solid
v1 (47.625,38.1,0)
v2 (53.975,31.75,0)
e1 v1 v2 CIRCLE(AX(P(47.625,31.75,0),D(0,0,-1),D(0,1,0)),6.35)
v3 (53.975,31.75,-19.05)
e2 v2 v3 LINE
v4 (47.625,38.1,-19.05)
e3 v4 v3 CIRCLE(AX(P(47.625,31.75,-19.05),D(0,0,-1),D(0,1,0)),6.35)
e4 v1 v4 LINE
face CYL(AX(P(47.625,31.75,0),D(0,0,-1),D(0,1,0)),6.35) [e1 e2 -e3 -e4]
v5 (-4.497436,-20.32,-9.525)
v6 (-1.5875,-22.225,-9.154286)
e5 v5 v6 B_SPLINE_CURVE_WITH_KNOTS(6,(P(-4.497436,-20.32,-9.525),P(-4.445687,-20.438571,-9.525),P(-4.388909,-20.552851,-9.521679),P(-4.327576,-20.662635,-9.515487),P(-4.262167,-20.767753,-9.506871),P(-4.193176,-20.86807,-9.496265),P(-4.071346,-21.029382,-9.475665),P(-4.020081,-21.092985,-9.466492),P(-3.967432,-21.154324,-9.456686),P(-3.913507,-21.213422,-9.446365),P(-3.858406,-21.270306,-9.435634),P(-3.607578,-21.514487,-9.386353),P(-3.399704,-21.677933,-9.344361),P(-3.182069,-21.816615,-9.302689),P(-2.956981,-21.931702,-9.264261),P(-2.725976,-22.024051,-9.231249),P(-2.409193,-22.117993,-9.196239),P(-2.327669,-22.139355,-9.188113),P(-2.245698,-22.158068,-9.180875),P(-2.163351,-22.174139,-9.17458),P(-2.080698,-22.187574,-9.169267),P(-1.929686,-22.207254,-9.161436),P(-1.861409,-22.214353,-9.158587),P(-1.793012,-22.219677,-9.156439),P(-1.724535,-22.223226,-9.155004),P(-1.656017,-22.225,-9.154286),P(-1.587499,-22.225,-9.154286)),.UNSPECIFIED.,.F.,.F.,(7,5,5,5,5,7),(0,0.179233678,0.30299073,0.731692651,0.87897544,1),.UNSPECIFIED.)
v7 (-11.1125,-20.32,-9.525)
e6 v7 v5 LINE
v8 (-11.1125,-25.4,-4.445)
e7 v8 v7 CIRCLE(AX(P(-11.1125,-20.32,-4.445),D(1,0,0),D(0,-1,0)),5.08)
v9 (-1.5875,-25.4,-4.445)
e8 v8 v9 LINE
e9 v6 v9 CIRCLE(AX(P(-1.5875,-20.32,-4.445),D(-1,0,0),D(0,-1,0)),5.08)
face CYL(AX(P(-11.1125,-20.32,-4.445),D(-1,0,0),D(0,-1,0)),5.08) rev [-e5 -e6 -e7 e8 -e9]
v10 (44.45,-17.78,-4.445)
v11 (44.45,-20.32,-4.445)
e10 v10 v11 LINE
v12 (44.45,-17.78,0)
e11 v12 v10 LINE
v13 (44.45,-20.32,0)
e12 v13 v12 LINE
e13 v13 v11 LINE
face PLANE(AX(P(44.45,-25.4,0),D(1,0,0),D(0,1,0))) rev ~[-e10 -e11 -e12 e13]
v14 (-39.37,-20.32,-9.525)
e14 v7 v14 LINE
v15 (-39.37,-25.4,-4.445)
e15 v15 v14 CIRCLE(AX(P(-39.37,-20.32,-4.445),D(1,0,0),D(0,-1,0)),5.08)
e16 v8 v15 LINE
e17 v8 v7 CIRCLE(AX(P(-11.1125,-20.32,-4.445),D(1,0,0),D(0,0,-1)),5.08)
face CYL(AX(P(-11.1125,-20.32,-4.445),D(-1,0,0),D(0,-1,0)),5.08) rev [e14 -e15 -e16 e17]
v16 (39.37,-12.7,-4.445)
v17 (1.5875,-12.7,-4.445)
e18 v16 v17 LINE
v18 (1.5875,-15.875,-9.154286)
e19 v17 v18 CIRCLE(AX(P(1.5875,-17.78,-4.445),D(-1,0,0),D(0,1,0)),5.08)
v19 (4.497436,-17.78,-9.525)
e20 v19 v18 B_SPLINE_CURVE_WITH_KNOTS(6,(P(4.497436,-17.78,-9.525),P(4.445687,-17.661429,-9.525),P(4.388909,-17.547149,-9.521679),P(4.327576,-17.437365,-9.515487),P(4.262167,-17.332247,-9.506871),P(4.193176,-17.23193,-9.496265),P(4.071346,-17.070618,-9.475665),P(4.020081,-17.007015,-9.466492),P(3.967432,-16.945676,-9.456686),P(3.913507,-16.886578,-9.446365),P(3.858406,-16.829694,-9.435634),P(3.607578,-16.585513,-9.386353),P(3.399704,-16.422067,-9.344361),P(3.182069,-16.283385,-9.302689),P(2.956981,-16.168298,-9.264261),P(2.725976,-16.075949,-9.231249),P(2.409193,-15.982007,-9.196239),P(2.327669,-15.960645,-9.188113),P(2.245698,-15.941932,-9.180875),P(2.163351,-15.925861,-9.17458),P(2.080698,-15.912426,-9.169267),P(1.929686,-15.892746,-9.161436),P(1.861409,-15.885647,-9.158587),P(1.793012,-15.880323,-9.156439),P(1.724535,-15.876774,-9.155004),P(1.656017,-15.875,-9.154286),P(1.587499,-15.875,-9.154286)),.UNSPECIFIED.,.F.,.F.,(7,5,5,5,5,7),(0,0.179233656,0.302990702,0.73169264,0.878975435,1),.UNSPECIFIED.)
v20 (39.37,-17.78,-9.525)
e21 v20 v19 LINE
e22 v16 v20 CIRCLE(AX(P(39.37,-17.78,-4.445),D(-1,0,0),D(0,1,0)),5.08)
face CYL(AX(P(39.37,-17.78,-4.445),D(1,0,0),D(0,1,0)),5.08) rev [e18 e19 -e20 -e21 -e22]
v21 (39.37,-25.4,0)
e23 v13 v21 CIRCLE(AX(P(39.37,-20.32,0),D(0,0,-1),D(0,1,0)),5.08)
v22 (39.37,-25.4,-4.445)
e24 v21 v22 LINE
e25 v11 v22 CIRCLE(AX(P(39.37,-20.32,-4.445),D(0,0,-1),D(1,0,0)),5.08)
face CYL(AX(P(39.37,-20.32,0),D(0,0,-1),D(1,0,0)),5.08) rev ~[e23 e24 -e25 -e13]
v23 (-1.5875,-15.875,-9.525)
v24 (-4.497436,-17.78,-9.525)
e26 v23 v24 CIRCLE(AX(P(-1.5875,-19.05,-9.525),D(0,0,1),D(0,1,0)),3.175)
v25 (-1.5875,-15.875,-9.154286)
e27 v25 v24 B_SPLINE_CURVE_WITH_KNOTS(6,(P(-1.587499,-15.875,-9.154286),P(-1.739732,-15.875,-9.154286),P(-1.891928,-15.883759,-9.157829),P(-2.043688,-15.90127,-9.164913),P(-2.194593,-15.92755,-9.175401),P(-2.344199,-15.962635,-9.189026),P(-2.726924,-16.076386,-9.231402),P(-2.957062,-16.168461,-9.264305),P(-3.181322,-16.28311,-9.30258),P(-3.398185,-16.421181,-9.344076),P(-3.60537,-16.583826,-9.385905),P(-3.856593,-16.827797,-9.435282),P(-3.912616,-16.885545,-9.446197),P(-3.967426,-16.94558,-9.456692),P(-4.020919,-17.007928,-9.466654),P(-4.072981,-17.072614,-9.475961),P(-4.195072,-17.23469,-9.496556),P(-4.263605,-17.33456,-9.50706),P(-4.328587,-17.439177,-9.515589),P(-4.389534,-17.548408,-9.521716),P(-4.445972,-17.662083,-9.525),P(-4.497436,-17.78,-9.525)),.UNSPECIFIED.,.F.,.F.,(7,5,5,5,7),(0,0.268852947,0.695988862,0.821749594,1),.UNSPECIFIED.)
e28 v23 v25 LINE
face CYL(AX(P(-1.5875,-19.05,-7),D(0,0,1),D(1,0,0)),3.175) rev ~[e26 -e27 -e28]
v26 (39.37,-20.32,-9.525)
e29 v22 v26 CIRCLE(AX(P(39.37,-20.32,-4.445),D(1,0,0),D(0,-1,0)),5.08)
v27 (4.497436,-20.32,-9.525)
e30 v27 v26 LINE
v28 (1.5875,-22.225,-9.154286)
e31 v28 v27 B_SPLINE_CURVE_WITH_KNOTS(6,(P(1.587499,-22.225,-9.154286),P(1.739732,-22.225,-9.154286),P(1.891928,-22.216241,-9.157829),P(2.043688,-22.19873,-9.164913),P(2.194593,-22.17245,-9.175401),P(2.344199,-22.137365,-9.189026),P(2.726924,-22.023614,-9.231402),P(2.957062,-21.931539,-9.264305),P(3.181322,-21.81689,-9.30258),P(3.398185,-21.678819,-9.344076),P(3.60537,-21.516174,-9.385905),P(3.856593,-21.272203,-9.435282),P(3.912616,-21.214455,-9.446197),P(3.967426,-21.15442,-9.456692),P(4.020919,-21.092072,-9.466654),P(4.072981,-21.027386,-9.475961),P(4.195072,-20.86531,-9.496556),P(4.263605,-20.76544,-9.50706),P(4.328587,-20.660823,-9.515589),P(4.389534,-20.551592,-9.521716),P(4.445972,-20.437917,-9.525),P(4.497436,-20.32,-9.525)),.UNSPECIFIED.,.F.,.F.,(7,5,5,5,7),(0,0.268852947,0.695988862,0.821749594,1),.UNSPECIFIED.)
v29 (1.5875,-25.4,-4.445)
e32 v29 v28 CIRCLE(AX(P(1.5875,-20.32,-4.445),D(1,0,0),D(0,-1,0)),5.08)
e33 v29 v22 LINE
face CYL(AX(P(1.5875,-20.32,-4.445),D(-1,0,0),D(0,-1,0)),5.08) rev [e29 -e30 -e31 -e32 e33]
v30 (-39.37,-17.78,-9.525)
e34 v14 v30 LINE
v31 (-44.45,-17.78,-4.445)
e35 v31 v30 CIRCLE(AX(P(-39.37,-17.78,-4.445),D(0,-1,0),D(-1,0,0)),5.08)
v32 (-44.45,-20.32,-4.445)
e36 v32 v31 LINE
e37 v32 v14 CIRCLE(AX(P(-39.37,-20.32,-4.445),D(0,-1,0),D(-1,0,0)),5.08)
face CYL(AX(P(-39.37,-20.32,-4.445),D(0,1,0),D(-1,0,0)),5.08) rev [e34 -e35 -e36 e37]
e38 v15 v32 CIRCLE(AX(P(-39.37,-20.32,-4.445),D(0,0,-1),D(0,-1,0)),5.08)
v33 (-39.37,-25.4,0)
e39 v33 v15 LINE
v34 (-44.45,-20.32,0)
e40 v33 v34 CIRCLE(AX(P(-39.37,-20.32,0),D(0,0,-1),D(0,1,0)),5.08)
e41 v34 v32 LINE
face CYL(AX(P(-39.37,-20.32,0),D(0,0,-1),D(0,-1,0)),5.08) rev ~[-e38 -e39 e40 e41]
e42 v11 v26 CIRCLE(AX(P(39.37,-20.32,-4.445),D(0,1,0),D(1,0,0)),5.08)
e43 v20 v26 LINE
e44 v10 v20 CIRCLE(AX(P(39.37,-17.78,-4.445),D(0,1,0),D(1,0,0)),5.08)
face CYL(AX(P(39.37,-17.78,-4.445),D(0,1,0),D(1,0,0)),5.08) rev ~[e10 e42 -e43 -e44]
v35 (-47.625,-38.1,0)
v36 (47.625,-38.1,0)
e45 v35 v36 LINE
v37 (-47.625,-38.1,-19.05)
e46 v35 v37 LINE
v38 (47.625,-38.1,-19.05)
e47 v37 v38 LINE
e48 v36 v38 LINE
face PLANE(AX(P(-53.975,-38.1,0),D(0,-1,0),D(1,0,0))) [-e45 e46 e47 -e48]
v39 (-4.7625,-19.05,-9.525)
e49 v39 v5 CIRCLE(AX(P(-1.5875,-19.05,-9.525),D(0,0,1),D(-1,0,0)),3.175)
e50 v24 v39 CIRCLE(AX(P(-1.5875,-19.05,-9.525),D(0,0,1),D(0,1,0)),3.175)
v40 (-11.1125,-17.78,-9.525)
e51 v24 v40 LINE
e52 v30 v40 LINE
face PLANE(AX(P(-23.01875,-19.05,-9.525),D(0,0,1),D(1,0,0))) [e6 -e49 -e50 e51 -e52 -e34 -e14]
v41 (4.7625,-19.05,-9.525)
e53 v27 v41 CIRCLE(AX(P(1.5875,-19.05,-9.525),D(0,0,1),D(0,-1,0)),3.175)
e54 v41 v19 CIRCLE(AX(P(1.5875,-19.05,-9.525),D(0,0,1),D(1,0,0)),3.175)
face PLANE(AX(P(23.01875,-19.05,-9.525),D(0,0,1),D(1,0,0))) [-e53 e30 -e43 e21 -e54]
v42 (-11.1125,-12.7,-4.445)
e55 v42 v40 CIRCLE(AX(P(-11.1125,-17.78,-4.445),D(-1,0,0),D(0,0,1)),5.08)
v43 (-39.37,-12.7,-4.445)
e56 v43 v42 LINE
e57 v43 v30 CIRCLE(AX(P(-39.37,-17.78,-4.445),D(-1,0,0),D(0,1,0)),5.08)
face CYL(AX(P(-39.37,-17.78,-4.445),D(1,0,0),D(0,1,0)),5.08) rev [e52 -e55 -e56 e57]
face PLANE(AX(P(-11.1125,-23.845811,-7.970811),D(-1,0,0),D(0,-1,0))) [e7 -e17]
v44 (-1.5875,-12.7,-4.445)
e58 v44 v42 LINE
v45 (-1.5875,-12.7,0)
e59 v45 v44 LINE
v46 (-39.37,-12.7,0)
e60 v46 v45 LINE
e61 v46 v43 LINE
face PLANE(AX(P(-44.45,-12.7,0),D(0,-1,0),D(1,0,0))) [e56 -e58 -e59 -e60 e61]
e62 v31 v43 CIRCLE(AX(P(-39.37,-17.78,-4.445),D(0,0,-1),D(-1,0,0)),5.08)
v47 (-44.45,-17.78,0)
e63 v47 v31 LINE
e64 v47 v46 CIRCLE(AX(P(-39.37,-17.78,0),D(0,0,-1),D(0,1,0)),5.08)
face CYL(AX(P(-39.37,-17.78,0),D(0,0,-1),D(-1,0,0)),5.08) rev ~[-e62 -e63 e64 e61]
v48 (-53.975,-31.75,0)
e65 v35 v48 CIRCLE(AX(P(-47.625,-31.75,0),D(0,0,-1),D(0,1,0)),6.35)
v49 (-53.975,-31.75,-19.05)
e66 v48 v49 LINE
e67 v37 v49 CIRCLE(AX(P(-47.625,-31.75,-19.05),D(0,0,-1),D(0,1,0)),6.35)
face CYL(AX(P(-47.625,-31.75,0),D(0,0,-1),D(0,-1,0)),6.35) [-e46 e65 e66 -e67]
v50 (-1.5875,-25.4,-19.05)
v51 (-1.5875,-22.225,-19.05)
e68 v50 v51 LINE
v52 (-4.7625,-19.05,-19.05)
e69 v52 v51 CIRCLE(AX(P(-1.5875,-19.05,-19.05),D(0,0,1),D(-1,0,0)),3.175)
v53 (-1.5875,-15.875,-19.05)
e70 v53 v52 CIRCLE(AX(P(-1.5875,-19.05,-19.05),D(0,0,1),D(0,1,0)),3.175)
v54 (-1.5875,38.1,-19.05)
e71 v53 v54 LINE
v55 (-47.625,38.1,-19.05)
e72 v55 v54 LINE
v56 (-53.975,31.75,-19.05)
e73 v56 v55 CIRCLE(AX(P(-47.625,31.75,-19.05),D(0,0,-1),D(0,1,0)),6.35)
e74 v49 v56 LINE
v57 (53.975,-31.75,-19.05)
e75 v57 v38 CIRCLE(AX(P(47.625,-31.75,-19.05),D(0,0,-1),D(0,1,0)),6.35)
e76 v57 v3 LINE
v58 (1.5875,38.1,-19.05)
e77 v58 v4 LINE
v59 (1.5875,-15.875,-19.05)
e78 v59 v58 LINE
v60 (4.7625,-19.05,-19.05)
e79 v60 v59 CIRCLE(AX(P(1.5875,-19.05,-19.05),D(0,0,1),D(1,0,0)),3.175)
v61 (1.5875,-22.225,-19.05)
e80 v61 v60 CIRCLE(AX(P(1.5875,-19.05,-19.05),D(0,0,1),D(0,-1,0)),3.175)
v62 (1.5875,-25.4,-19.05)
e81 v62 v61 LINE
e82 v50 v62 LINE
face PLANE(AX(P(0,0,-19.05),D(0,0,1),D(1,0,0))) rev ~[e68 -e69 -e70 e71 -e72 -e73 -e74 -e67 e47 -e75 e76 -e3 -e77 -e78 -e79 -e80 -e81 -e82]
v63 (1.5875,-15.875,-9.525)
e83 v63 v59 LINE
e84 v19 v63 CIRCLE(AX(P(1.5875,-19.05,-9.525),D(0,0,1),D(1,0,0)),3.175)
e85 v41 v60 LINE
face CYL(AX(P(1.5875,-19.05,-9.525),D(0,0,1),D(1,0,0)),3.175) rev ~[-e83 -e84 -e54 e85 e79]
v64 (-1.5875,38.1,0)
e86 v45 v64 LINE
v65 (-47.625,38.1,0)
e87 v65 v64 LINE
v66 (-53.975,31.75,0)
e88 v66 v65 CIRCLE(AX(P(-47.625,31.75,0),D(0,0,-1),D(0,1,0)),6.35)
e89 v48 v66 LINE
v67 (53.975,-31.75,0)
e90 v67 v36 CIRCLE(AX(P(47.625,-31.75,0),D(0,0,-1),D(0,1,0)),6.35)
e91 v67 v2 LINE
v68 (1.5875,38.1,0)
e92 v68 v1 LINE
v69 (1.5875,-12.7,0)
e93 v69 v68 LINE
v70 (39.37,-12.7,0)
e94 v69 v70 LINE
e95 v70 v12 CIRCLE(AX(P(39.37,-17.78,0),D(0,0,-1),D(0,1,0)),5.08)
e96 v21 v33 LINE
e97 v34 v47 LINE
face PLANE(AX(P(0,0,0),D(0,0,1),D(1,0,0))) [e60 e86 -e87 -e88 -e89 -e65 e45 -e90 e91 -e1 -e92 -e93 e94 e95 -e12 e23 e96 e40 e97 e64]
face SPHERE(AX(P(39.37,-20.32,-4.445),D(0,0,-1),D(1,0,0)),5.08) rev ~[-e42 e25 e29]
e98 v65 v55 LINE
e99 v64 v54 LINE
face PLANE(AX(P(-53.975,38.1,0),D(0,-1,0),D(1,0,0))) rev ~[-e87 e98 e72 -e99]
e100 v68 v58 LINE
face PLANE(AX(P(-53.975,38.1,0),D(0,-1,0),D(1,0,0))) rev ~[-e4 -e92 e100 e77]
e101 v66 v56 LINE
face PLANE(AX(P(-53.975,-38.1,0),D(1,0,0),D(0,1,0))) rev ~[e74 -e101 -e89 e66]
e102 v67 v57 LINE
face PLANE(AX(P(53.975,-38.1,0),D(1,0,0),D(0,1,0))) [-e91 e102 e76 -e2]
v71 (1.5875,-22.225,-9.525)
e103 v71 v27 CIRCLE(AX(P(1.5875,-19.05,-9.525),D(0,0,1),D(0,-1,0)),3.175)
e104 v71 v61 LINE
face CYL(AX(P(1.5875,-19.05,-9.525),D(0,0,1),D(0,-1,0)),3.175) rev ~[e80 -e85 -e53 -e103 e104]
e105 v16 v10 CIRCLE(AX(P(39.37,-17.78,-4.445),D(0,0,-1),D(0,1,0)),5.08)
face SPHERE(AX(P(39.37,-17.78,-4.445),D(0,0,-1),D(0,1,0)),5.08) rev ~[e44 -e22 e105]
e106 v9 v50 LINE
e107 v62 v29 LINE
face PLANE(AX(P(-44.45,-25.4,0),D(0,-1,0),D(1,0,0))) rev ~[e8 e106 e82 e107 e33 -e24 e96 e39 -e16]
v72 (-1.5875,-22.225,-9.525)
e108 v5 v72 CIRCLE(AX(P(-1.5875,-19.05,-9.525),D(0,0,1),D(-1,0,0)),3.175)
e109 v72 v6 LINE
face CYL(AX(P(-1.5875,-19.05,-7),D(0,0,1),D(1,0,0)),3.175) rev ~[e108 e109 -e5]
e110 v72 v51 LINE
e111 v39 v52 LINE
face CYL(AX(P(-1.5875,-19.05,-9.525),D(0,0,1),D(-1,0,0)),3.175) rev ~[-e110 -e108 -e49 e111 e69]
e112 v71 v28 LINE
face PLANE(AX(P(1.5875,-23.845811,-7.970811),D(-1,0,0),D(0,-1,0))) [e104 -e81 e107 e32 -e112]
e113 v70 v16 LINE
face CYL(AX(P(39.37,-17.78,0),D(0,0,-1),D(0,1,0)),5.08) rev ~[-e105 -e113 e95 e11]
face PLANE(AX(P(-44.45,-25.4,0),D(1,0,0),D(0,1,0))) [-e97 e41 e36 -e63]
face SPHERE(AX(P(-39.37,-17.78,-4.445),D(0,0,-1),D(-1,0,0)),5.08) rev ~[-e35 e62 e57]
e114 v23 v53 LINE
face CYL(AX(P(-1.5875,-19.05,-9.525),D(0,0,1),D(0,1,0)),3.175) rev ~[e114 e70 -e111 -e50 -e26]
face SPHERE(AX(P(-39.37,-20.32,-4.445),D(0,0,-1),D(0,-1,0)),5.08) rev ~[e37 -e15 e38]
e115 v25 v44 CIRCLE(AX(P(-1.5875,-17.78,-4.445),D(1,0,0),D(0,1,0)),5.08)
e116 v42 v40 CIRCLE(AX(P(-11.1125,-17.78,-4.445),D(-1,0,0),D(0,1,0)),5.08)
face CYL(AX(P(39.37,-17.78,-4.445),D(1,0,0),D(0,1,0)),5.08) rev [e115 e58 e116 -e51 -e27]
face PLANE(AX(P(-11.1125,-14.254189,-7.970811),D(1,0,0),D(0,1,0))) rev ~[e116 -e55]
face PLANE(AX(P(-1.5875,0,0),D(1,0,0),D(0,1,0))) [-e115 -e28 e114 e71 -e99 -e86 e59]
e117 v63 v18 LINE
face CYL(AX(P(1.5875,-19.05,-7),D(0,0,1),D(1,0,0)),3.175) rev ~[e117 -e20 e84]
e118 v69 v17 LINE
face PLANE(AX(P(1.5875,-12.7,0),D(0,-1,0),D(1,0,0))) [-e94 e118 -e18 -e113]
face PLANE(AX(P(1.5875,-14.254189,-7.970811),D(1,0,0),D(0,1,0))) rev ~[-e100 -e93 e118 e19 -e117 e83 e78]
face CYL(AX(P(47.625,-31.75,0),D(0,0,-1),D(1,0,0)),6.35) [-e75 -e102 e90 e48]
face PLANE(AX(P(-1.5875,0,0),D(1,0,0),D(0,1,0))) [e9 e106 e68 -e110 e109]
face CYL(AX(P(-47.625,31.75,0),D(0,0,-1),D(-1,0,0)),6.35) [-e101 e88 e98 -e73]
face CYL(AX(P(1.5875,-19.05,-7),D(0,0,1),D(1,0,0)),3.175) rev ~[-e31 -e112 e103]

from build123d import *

# Parameters (mm, degrees)
F0_W         = 107.95
F0_H         = 76.2
F1_DEPTH     = 19.05
F2_W         = 3.175
F2_H         = 63.5
F3_DEPTH     = 19.051
F4_W         = 42.8625
F4_H         = 12.7
F5_DEPTH     = 9.525
F7_DEPTH     = 12.7
F8_R         = 5.08
F9_T1_DEPTH  = 2.54
F9_T6_DEPTH  = 37.7825
F9_S7_R      = 3.175
F9_T8_DEPTH  = 21
F9_T12_DEPTH = 50.4825
F9_S14_R     = 3.175
F9_T15_DEPTH = 27
F9_T17_ANGLE = 90
F9_T19_ANGLE = 90
F9_T23_DEPTH = 50.4825
F9_S25_R     = 3.175
F9_T26_DEPTH = 27
F9_T30_DEPTH = 37.7825
F9_S31_R     = 3.175
F9_T32_DEPTH = 21
F10_R        = 5.08
F11_R        = 6.35


# Not quite as in the source:
# - a fillet or chamfer that OpenCascade refuses, or shapes differently, is made with other operations: its cross-section is extruded or revolved along the edge and cut away or added


with BuildPart() as f1:
    # F0 (on Top) → F1 (new body)
    with BuildSketch(Plane.XY):
        Rectangle(F0_W, F0_H)
    extrude(amount=-F1_DEPTH)

    # F2 (on face) → F3 (cut, through all)
    with BuildSketch(Plane.XY):
        with Locations((0, 6.35)):
            Rectangle(F2_W, F2_H)
    extrude(amount=-F3_DEPTH, mode=Mode.SUBTRACT)

    # F4 (on face) → F5 (cut)
    with BuildSketch(Plane.XY):
        with Locations((23.01875, -19.05)):
            Rectangle(F4_W, F4_H)
        with Locations((-23.01875, -19.05)):
            Rectangle(F4_W, F4_H)
    extrude(amount=-F5_DEPTH, mode=Mode.SUBTRACT)

    # F6 (on face) → F7 (cut)
    with BuildSketch(Plane.XY.offset(-9.525)):
        with BuildLine():
            Line((1.5875, -15.875), (-1.5875, -15.875))
            ThreePointArc((-1.5875, -15.875), (-3.8325640303, -16.8049359697), (-4.7625, -19.05))
            ThreePointArc((-4.7625, -19.05), (-3.8325640303, -21.2950640303), (-1.5875, -22.225))
            Line((-1.5875, -22.225), (1.5875, -22.225))
            Line((1.5875, -22.225), (1.5875, -15.875))
        make_face()
        with BuildLine():
            ThreePointArc((4.7625, -19.05), (3.8325640303, -16.8049359697), (1.5875, -15.875))
            Line((1.5875, -15.875), (1.5875, -22.225))
            ThreePointArc((1.5875, -22.225), (3.8325640303, -21.2950640303), (4.7625, -19.05))
        make_face()
    extrude(amount=-F7_DEPTH, mode=Mode.SUBTRACT)

    # F8
    f8_edges = [f1.edges().sort_by_distance(p)[0] for p in [
        (-44.45, -12.7, -4.7625),
        (-44.45, -25.4, -4.7625),
        (44.45, -12.7, -4.7625),
        (44.45, -25.4, -4.7625),
    ]]
    fillet(f8_edges, radius=F8_R)

    # F9: fillet of radius 5.08 on 1 edges, made by hand

    # F9_s2 → F9_t1 (join)
    with BuildSketch(Plane.XZ.offset(17.78)):
        with BuildLine():
            ThreePointArc((44.45, -4.445), (42.9621024484, -8.0371024484), (39.37, -9.525))
            Line((39.37, -9.525), (44.45, -9.525))
            Line((44.45, -9.525), (44.45, -4.445))
        make_face()
    extrude(amount=F9_T1_DEPTH)


with BuildPart() as f9_tool4:
    # F9_s5 → F9_t6 (new body)
    with BuildSketch(Plane.YZ.offset(39.37)):
        with BuildLine():
            ThreePointArc((-12.7, -4.445), (-14.1878975516, -8.0371024484), (-17.78, -9.525))
            Line((-17.78, -9.525), (-12.7, -9.525))
            Line((-12.7, -9.525), (-12.7, -4.445))
        make_face()
    extrude(amount=-F9_T6_DEPTH)

    # F9_s7 → F9_t8 (cut, symmetric)
    with BuildSketch(Plane.XY.offset(-7)):
        with Locations((1.5875, -19.05)):
            Circle(F9_S7_R)
    extrude(amount=F9_T8_DEPTH, both=True, mode=Mode.SUBTRACT)


with BuildPart() as f1_1:
    add(f1.part)

    # F9_t3: union F9_tool4
    add(f9_tool4.part)


with BuildPart() as f9_tool10:
    # F9_s11 → F9_t12 (new body)
    with BuildSketch(Plane.YZ.offset(39.37)):
        with BuildLine():
            ThreePointArc((-12.7, -4.445), (-14.1878975516, -8.0371024484), (-17.78, -9.525))
            Line((-17.78, -9.525), (-12.7, -9.525))
            Line((-12.7, -9.525), (-12.7, -4.445))
        make_face()
    extrude(amount=-F9_T12_DEPTH)

    split(bisect_by=Plane.YZ.offset(-1.5875), keep=Keep.BOTTOM)

    # F9_s14 → F9_t15 (cut, symmetric)
    with BuildSketch(Plane.XY.offset(-7)):
        with Locations((-1.5875, -19.05)):
            Circle(F9_S14_R)
    extrude(amount=F9_T15_DEPTH, both=True, mode=Mode.SUBTRACT)


with BuildPart() as f1_2:
    add(f1_1.part)

    # F9_t9: union F9_tool10
    add(f9_tool10.part)

    # F9_s16 → F9_t17 (revolve)
    with BuildSketch(Plane.YZ.offset(39.37)):
        with BuildLine():
            ThreePointArc((-12.7, -4.445), (-14.1878975516, -8.0371024484), (-17.78, -9.525))
            Line((-17.78, -9.525), (-12.7, -9.525))
            Line((-12.7, -9.525), (-12.7, -4.445))
        make_face()
    revolve(axis=Axis((39.37, -17.78, -9.525), (0, 0, -1)), revolution_arc=F9_T17_ANGLE)

    # F9_s18 → F9_t19 (revolve)
    with BuildSketch(Plane.XZ.offset(20.32)):
        with BuildLine():
            ThreePointArc((44.45, -4.445), (42.9621024484, -8.0371024484), (39.37, -9.525))
            Line((39.37, -9.525), (44.45, -9.525))
            Line((44.45, -9.525), (44.45, -4.445))
        make_face()
    revolve(axis=Axis((39.37, -20.32, -9.525), (0, 0, -1)), revolution_arc=F9_T19_ANGLE)


with BuildPart() as f9_tool21:
    # F9_s22 → F9_t23 (new body)
    with BuildSketch(Plane.YZ.offset(-11.1125)):
        with BuildLine():
            ThreePointArc((-25.4, -4.445), (-23.9121024484, -8.0371024484), (-20.32, -9.525))
            Line((-20.32, -9.525), (-25.4, -9.525))
            Line((-25.4, -9.525), (-25.4, -4.445))
        make_face()
    extrude(amount=F9_T23_DEPTH)

    split(bisect_by=Plane.YZ.offset(-1.5875), keep=Keep.BOTTOM)

    # F9_s25 → F9_t26 (cut, symmetric)
    with BuildSketch(Plane.XY.offset(-7)):
        with Locations((-1.5875, -19.05)):
            Circle(F9_S25_R)
    extrude(amount=F9_T26_DEPTH, both=True, mode=Mode.SUBTRACT)


with BuildPart() as f1_3:
    add(f1_2.part)

    # F9_t20: union F9_tool21
    add(f9_tool21.part)


with BuildPart() as f9_tool28:
    # F9_s29 → F9_t30 (new body)
    with BuildSketch(Plane.YZ.offset(1.5875)):
        with BuildLine():
            ThreePointArc((-25.4, -4.445), (-23.9121024484, -8.0371024484), (-20.32, -9.525))
            Line((-20.32, -9.525), (-25.4, -9.525))
            Line((-25.4, -9.525), (-25.4, -4.445))
        make_face()
    extrude(amount=F9_T30_DEPTH)

    # F9_s31 → F9_t32 (cut, symmetric)
    with BuildSketch(Plane.XY.offset(-7)):
        with Locations((1.5875, -19.05)):
            Circle(F9_S31_R)
    extrude(amount=F9_T32_DEPTH, both=True, mode=Mode.SUBTRACT)


with BuildPart() as f1_4:
    add(f1_3.part)

    # F9_t27: union F9_tool28
    add(f9_tool28.part)

    # F10
    f10_edges = [f1_4.edges().sort_by_distance(p)[0] for p in [
        (-25.24125, -12.7, -9.525),
    ]]
    fillet(f10_edges, radius=F10_R)

    # F11
    f11_edges = [f1_4.edges().sort_by_distance(p)[0] for p in [
        (53.975, -38.1, -9.525),
        (53.975, 38.1, -9.525),
        (-53.975, -38.1, -9.525),
        (-53.975, 38.1, -9.525),
    ]]
    fillet(f11_edges, radius=F11_R)


solid = f1_4.part
